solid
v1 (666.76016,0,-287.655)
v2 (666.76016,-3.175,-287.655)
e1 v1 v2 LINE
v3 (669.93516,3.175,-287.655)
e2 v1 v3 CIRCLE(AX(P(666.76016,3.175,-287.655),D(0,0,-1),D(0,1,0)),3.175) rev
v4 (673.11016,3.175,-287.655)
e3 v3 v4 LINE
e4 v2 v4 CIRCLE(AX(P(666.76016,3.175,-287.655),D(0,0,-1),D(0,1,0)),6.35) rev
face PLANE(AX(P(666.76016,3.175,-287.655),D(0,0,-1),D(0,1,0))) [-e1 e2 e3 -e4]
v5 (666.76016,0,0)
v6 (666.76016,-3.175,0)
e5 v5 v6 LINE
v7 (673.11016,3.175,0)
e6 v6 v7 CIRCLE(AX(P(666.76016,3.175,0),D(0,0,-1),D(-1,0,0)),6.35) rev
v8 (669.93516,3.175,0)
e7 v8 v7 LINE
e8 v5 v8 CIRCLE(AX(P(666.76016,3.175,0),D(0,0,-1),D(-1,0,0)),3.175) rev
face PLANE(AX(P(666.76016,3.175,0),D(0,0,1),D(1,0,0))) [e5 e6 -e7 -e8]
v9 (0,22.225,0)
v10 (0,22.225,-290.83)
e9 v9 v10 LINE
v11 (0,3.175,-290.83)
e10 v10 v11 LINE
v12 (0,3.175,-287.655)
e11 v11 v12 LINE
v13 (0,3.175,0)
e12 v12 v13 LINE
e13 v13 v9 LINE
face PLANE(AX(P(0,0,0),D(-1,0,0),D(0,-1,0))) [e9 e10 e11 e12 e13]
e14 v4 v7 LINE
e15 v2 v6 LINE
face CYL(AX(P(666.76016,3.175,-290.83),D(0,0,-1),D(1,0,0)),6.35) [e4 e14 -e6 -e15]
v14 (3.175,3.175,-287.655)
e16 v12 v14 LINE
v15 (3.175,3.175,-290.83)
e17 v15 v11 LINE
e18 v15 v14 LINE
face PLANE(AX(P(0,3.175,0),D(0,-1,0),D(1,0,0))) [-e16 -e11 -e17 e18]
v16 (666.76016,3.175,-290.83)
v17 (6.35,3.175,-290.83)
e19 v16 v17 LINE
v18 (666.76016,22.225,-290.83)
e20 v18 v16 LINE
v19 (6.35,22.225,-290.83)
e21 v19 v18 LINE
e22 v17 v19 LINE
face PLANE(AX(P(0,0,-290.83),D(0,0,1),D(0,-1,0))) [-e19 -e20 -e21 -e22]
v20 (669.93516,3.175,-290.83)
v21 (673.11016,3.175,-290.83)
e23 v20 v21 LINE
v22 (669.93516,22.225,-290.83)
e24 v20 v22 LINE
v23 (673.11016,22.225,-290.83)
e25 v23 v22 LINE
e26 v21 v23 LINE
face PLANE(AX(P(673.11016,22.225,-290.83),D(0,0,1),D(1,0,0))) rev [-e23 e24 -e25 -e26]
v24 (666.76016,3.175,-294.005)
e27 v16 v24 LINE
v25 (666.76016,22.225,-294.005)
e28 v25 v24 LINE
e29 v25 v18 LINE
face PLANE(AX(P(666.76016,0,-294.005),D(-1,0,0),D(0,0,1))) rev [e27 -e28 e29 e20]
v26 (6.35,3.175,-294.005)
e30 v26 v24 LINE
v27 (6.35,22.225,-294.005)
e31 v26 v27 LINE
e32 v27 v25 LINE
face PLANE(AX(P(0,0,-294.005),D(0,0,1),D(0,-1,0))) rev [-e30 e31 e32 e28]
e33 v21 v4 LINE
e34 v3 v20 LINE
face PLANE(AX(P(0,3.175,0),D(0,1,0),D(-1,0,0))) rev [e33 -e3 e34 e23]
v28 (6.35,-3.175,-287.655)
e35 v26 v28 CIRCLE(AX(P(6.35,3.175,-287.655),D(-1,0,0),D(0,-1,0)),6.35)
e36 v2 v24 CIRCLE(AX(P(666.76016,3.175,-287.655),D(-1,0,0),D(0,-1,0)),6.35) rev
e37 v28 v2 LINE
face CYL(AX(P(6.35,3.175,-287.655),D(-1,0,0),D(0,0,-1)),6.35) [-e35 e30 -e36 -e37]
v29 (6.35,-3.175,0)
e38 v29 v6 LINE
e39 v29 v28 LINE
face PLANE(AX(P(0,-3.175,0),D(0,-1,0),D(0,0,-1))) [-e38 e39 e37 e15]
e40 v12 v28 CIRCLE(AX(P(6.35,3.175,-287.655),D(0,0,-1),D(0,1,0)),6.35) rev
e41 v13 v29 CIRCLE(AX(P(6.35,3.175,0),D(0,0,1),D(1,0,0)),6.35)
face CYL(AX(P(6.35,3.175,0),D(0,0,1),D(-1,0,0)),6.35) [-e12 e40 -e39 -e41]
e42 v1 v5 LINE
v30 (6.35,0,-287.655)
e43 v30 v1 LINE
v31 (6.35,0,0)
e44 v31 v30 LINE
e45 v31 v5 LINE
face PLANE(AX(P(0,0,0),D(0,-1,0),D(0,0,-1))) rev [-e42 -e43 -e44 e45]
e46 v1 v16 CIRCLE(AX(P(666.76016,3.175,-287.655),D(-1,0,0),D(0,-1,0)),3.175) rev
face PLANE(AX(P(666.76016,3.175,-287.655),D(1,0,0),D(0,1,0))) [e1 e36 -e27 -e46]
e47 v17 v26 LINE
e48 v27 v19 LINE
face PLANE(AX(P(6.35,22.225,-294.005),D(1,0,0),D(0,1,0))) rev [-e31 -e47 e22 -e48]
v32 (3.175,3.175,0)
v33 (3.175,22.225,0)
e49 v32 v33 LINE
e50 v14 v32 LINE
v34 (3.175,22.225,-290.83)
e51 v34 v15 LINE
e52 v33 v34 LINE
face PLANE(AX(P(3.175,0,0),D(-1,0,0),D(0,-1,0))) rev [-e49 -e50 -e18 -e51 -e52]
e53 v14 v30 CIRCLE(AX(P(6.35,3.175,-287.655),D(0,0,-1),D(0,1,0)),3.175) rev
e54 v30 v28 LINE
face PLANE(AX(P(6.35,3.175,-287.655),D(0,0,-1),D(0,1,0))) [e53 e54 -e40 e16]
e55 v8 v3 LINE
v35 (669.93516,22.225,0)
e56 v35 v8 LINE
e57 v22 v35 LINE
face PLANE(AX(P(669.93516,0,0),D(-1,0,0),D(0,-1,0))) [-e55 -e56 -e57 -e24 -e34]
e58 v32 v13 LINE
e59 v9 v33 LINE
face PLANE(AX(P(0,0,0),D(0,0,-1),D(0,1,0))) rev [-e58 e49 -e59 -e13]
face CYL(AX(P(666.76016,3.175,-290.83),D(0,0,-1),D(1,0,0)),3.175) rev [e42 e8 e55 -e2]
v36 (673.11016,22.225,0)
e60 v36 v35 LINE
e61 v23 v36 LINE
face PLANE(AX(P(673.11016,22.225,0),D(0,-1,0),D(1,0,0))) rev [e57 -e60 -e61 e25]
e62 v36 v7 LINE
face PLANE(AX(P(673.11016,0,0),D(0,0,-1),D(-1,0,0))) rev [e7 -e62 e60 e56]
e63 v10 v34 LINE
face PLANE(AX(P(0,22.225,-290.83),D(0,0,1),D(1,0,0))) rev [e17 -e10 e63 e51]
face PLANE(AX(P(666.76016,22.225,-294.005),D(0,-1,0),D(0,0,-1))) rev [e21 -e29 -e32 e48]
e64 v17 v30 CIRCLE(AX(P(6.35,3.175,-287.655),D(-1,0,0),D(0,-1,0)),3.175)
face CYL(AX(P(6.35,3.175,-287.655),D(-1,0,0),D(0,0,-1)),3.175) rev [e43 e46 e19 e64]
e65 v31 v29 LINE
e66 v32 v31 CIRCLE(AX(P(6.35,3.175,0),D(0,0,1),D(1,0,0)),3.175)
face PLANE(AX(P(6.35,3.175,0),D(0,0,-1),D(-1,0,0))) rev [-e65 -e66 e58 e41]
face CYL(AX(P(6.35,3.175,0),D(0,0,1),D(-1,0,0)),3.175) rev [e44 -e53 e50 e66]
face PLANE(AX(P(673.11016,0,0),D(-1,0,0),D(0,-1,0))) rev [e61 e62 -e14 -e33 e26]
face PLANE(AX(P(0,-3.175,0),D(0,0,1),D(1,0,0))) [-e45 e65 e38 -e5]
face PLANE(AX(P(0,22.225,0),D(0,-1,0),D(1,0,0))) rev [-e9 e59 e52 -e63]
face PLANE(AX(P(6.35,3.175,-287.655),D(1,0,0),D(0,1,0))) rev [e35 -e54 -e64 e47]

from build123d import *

# Parameters (mm, degrees)
SKETCH1_W                      = 673.11016
SKETCH1_H                      = 290.83
BASE_FLANGE1_DEPTH             = 3.175
EDGE_FLANGE2_STRIP_W           = 19.05
EDGE_FLANGE2_STRIP_H           = 3.175
EDGE_FLANGE2_STRIP_CUT_DEPTH   = 290.83
EDGE_FLANGE2_STRIP_2_W         = 19.05
EDGE_FLANGE2_STRIP_2_H         = 3.175
EDGE_FLANGE2_STRIP_CUT_2_DEPTH = 290.83
EDGE_FLANGE2_DEPTH             = 290.83
EDGE_FLANGE2_BEND_DEPTH        = 290.83
EDGE_FLANGE3_DEPTH             = 673.11016
EDGE_FLANGE3_2_DEPTH           = 6.35
EDGE_FLANGE3_START             = 666.76016
EDGE_FLANGE3_3_DEPTH           = 6.35
EDGE_FLANGE3_START_2           = 6.35
EDGE_FLANGE3_4_DEPTH           = 660.41016


# Read off the part's stored shape, not the designer's step: Edge-Flange3
# Sheet-metal steps are written as plain solids
with BuildPart() as part:
    # Sketch1 → Base-Flange1 (new body)
    with BuildSketch(Plane(origin=(0, 0, 0), x_dir=(1, 0, 0), z_dir=(0, 1, 0))):
        with Locations((336.55508, 145.415)):
            Rectangle(SKETCH1_W, SKETCH1_H)
    extrude(amount=-BASE_FLANGE1_DEPTH)

    # Edge-Flange2 strip (across the edge) → Edge-Flange2 strip cut (cut)
    with BuildSketch(Plane(origin=(673.11016, 0, 0), x_dir=(-1, 0, 0), z_dir=(0, 0, -1))):
        with Locations((-3.175, -1.5875)):
            Rectangle(EDGE_FLANGE2_STRIP_W, EDGE_FLANGE2_STRIP_H)
    extrude(amount=EDGE_FLANGE2_STRIP_CUT_DEPTH, mode=Mode.SUBTRACT)

    # Edge-Flange2 strip 2 (across the edge) → Edge-Flange2 strip cut 2 (cut)
    with BuildSketch(Plane.XY.offset(-290.83)):
        with Locations((-3.175, -1.5875)):
            Rectangle(EDGE_FLANGE2_STRIP_2_W, EDGE_FLANGE2_STRIP_2_H)
    extrude(amount=EDGE_FLANGE2_STRIP_CUT_2_DEPTH, mode=Mode.SUBTRACT)

    # Edge-Flange2 section (across the edge) → Edge-Flange2 (add)
    with BuildSketch(Plane(origin=(673.11016, 0, 0), x_dir=(-1, 0, 0), z_dir=(0, 0, -1))):
        with BuildLine():
            Line((0, 3.175), (0, 22.225))
            Line((0, 22.225), (3.175, 22.225))
            Line((3.175, 22.225), (3.175, 3.175))
            ThreePointArc((3.175, 3.175), (4.10493597, 0.92993597), (6.35, 0))
            Line((6.35, 0), (6.35, -3.175))
            ThreePointArc((6.35, -3.175), (1.859871939, -1.315128061), (0, 3.175))
        make_face()
    extrude(amount=EDGE_FLANGE2_DEPTH)

    # Edge-Flange2 section 2 (across the edge) → Edge-Flange2 bend (add)
    with BuildSketch(Plane.XY.offset(-290.83)):
        with BuildLine():
            Line((0, 3.175), (0, 22.225))
            Line((0, 22.225), (3.175, 22.225))
            Line((3.175, 22.225), (3.175, 3.175))
            ThreePointArc((3.175, 3.175), (4.10493597, 0.92993597), (6.35, 0))
            Line((6.35, 0), (6.35, -3.175))
            ThreePointArc((6.35, -3.175), (1.859871939, -1.315128061), (0, 3.175))
        make_face()
    extrude(amount=EDGE_FLANGE2_BEND_DEPTH)

    # Edge-Flange3 outline → Edge-Flange3 (cut)
    with BuildSketch(Plane.YZ):
        with BuildLine():
            Line((3.175, -290.83), (3.175, -287.655))
            Line((3.175, -287.655), (0, -287.655))
            ThreePointArc((0, -287.655), (0.92993597, -289.90006403), (3.175, -290.83))
        make_face()
        with BuildLine():
            ThreePointArc((-2.324261315, -290.83), (-2.958628997, -289.298500936), (-3.175, -287.655))
            Line((-3.175, -287.655), (-3.175, -290.83))
            Line((-3.175, -290.83), (-2.324261315, -290.83))
        make_face()
    extrude(amount=EDGE_FLANGE3_DEPTH, mode=Mode.SUBTRACT)

    # Edge-Flange3 2 outline → Edge-Flange3 2 (cut)
    with BuildSketch(Plane.YZ):
        with BuildLine():
            ThreePointArc((3.175, -290.83), (0.92993597, -289.90006403), (0, -287.655))
            Line((0, -287.655), (-3.175, -287.655))
            ThreePointArc((-3.175, -287.655), (-2.958628997, -289.298500936), (-2.324261315, -290.83))
            Line((-2.324261315, -290.83), (3.175, -290.83))
        make_face()
    extrude(amount=EDGE_FLANGE3_2_DEPTH, mode=Mode.SUBTRACT)

    # Edge-Flange3 3 outline → Edge-Flange3 3 (cut)
    with BuildSketch(Plane.YZ.offset(EDGE_FLANGE3_START)):
        with BuildLine():
            ThreePointArc((3.175, -290.83), (0.92993597, -289.90006403), (0, -287.655))
            Line((0, -287.655), (-3.175, -287.655))
            ThreePointArc((-3.175, -287.655), (-2.958628997, -289.298500936), (-2.324261315, -290.83))
            Line((-2.324261315, -290.83), (3.175, -290.83))
        make_face()
    extrude(amount=EDGE_FLANGE3_3_DEPTH, mode=Mode.SUBTRACT)

    # Edge-Flange3 4 outline → Edge-Flange3 4 (add)
    with BuildSketch(Plane.YZ.offset(EDGE_FLANGE3_START_2)):
        with BuildLine():
            Line((0, -287.655), (0, -290.83))
            Line((0, -290.83), (-2.324261315, -290.83))
            ThreePointArc((-2.324261315, -290.83), (-1e-09, -293.154261314), (3.175, -294.005))
            Line((3.175, -294.005), (22.225, -294.005))
            Line((22.225, -294.005), (22.225, -290.83))
            Line((22.225, -290.83), (3.175, -290.83))
            ThreePointArc((3.175, -290.83), (0.92993597, -289.90006403), (0, -287.655))
        make_face()
    extrude(amount=EDGE_FLANGE3_4_DEPTH)


solid = part.part
